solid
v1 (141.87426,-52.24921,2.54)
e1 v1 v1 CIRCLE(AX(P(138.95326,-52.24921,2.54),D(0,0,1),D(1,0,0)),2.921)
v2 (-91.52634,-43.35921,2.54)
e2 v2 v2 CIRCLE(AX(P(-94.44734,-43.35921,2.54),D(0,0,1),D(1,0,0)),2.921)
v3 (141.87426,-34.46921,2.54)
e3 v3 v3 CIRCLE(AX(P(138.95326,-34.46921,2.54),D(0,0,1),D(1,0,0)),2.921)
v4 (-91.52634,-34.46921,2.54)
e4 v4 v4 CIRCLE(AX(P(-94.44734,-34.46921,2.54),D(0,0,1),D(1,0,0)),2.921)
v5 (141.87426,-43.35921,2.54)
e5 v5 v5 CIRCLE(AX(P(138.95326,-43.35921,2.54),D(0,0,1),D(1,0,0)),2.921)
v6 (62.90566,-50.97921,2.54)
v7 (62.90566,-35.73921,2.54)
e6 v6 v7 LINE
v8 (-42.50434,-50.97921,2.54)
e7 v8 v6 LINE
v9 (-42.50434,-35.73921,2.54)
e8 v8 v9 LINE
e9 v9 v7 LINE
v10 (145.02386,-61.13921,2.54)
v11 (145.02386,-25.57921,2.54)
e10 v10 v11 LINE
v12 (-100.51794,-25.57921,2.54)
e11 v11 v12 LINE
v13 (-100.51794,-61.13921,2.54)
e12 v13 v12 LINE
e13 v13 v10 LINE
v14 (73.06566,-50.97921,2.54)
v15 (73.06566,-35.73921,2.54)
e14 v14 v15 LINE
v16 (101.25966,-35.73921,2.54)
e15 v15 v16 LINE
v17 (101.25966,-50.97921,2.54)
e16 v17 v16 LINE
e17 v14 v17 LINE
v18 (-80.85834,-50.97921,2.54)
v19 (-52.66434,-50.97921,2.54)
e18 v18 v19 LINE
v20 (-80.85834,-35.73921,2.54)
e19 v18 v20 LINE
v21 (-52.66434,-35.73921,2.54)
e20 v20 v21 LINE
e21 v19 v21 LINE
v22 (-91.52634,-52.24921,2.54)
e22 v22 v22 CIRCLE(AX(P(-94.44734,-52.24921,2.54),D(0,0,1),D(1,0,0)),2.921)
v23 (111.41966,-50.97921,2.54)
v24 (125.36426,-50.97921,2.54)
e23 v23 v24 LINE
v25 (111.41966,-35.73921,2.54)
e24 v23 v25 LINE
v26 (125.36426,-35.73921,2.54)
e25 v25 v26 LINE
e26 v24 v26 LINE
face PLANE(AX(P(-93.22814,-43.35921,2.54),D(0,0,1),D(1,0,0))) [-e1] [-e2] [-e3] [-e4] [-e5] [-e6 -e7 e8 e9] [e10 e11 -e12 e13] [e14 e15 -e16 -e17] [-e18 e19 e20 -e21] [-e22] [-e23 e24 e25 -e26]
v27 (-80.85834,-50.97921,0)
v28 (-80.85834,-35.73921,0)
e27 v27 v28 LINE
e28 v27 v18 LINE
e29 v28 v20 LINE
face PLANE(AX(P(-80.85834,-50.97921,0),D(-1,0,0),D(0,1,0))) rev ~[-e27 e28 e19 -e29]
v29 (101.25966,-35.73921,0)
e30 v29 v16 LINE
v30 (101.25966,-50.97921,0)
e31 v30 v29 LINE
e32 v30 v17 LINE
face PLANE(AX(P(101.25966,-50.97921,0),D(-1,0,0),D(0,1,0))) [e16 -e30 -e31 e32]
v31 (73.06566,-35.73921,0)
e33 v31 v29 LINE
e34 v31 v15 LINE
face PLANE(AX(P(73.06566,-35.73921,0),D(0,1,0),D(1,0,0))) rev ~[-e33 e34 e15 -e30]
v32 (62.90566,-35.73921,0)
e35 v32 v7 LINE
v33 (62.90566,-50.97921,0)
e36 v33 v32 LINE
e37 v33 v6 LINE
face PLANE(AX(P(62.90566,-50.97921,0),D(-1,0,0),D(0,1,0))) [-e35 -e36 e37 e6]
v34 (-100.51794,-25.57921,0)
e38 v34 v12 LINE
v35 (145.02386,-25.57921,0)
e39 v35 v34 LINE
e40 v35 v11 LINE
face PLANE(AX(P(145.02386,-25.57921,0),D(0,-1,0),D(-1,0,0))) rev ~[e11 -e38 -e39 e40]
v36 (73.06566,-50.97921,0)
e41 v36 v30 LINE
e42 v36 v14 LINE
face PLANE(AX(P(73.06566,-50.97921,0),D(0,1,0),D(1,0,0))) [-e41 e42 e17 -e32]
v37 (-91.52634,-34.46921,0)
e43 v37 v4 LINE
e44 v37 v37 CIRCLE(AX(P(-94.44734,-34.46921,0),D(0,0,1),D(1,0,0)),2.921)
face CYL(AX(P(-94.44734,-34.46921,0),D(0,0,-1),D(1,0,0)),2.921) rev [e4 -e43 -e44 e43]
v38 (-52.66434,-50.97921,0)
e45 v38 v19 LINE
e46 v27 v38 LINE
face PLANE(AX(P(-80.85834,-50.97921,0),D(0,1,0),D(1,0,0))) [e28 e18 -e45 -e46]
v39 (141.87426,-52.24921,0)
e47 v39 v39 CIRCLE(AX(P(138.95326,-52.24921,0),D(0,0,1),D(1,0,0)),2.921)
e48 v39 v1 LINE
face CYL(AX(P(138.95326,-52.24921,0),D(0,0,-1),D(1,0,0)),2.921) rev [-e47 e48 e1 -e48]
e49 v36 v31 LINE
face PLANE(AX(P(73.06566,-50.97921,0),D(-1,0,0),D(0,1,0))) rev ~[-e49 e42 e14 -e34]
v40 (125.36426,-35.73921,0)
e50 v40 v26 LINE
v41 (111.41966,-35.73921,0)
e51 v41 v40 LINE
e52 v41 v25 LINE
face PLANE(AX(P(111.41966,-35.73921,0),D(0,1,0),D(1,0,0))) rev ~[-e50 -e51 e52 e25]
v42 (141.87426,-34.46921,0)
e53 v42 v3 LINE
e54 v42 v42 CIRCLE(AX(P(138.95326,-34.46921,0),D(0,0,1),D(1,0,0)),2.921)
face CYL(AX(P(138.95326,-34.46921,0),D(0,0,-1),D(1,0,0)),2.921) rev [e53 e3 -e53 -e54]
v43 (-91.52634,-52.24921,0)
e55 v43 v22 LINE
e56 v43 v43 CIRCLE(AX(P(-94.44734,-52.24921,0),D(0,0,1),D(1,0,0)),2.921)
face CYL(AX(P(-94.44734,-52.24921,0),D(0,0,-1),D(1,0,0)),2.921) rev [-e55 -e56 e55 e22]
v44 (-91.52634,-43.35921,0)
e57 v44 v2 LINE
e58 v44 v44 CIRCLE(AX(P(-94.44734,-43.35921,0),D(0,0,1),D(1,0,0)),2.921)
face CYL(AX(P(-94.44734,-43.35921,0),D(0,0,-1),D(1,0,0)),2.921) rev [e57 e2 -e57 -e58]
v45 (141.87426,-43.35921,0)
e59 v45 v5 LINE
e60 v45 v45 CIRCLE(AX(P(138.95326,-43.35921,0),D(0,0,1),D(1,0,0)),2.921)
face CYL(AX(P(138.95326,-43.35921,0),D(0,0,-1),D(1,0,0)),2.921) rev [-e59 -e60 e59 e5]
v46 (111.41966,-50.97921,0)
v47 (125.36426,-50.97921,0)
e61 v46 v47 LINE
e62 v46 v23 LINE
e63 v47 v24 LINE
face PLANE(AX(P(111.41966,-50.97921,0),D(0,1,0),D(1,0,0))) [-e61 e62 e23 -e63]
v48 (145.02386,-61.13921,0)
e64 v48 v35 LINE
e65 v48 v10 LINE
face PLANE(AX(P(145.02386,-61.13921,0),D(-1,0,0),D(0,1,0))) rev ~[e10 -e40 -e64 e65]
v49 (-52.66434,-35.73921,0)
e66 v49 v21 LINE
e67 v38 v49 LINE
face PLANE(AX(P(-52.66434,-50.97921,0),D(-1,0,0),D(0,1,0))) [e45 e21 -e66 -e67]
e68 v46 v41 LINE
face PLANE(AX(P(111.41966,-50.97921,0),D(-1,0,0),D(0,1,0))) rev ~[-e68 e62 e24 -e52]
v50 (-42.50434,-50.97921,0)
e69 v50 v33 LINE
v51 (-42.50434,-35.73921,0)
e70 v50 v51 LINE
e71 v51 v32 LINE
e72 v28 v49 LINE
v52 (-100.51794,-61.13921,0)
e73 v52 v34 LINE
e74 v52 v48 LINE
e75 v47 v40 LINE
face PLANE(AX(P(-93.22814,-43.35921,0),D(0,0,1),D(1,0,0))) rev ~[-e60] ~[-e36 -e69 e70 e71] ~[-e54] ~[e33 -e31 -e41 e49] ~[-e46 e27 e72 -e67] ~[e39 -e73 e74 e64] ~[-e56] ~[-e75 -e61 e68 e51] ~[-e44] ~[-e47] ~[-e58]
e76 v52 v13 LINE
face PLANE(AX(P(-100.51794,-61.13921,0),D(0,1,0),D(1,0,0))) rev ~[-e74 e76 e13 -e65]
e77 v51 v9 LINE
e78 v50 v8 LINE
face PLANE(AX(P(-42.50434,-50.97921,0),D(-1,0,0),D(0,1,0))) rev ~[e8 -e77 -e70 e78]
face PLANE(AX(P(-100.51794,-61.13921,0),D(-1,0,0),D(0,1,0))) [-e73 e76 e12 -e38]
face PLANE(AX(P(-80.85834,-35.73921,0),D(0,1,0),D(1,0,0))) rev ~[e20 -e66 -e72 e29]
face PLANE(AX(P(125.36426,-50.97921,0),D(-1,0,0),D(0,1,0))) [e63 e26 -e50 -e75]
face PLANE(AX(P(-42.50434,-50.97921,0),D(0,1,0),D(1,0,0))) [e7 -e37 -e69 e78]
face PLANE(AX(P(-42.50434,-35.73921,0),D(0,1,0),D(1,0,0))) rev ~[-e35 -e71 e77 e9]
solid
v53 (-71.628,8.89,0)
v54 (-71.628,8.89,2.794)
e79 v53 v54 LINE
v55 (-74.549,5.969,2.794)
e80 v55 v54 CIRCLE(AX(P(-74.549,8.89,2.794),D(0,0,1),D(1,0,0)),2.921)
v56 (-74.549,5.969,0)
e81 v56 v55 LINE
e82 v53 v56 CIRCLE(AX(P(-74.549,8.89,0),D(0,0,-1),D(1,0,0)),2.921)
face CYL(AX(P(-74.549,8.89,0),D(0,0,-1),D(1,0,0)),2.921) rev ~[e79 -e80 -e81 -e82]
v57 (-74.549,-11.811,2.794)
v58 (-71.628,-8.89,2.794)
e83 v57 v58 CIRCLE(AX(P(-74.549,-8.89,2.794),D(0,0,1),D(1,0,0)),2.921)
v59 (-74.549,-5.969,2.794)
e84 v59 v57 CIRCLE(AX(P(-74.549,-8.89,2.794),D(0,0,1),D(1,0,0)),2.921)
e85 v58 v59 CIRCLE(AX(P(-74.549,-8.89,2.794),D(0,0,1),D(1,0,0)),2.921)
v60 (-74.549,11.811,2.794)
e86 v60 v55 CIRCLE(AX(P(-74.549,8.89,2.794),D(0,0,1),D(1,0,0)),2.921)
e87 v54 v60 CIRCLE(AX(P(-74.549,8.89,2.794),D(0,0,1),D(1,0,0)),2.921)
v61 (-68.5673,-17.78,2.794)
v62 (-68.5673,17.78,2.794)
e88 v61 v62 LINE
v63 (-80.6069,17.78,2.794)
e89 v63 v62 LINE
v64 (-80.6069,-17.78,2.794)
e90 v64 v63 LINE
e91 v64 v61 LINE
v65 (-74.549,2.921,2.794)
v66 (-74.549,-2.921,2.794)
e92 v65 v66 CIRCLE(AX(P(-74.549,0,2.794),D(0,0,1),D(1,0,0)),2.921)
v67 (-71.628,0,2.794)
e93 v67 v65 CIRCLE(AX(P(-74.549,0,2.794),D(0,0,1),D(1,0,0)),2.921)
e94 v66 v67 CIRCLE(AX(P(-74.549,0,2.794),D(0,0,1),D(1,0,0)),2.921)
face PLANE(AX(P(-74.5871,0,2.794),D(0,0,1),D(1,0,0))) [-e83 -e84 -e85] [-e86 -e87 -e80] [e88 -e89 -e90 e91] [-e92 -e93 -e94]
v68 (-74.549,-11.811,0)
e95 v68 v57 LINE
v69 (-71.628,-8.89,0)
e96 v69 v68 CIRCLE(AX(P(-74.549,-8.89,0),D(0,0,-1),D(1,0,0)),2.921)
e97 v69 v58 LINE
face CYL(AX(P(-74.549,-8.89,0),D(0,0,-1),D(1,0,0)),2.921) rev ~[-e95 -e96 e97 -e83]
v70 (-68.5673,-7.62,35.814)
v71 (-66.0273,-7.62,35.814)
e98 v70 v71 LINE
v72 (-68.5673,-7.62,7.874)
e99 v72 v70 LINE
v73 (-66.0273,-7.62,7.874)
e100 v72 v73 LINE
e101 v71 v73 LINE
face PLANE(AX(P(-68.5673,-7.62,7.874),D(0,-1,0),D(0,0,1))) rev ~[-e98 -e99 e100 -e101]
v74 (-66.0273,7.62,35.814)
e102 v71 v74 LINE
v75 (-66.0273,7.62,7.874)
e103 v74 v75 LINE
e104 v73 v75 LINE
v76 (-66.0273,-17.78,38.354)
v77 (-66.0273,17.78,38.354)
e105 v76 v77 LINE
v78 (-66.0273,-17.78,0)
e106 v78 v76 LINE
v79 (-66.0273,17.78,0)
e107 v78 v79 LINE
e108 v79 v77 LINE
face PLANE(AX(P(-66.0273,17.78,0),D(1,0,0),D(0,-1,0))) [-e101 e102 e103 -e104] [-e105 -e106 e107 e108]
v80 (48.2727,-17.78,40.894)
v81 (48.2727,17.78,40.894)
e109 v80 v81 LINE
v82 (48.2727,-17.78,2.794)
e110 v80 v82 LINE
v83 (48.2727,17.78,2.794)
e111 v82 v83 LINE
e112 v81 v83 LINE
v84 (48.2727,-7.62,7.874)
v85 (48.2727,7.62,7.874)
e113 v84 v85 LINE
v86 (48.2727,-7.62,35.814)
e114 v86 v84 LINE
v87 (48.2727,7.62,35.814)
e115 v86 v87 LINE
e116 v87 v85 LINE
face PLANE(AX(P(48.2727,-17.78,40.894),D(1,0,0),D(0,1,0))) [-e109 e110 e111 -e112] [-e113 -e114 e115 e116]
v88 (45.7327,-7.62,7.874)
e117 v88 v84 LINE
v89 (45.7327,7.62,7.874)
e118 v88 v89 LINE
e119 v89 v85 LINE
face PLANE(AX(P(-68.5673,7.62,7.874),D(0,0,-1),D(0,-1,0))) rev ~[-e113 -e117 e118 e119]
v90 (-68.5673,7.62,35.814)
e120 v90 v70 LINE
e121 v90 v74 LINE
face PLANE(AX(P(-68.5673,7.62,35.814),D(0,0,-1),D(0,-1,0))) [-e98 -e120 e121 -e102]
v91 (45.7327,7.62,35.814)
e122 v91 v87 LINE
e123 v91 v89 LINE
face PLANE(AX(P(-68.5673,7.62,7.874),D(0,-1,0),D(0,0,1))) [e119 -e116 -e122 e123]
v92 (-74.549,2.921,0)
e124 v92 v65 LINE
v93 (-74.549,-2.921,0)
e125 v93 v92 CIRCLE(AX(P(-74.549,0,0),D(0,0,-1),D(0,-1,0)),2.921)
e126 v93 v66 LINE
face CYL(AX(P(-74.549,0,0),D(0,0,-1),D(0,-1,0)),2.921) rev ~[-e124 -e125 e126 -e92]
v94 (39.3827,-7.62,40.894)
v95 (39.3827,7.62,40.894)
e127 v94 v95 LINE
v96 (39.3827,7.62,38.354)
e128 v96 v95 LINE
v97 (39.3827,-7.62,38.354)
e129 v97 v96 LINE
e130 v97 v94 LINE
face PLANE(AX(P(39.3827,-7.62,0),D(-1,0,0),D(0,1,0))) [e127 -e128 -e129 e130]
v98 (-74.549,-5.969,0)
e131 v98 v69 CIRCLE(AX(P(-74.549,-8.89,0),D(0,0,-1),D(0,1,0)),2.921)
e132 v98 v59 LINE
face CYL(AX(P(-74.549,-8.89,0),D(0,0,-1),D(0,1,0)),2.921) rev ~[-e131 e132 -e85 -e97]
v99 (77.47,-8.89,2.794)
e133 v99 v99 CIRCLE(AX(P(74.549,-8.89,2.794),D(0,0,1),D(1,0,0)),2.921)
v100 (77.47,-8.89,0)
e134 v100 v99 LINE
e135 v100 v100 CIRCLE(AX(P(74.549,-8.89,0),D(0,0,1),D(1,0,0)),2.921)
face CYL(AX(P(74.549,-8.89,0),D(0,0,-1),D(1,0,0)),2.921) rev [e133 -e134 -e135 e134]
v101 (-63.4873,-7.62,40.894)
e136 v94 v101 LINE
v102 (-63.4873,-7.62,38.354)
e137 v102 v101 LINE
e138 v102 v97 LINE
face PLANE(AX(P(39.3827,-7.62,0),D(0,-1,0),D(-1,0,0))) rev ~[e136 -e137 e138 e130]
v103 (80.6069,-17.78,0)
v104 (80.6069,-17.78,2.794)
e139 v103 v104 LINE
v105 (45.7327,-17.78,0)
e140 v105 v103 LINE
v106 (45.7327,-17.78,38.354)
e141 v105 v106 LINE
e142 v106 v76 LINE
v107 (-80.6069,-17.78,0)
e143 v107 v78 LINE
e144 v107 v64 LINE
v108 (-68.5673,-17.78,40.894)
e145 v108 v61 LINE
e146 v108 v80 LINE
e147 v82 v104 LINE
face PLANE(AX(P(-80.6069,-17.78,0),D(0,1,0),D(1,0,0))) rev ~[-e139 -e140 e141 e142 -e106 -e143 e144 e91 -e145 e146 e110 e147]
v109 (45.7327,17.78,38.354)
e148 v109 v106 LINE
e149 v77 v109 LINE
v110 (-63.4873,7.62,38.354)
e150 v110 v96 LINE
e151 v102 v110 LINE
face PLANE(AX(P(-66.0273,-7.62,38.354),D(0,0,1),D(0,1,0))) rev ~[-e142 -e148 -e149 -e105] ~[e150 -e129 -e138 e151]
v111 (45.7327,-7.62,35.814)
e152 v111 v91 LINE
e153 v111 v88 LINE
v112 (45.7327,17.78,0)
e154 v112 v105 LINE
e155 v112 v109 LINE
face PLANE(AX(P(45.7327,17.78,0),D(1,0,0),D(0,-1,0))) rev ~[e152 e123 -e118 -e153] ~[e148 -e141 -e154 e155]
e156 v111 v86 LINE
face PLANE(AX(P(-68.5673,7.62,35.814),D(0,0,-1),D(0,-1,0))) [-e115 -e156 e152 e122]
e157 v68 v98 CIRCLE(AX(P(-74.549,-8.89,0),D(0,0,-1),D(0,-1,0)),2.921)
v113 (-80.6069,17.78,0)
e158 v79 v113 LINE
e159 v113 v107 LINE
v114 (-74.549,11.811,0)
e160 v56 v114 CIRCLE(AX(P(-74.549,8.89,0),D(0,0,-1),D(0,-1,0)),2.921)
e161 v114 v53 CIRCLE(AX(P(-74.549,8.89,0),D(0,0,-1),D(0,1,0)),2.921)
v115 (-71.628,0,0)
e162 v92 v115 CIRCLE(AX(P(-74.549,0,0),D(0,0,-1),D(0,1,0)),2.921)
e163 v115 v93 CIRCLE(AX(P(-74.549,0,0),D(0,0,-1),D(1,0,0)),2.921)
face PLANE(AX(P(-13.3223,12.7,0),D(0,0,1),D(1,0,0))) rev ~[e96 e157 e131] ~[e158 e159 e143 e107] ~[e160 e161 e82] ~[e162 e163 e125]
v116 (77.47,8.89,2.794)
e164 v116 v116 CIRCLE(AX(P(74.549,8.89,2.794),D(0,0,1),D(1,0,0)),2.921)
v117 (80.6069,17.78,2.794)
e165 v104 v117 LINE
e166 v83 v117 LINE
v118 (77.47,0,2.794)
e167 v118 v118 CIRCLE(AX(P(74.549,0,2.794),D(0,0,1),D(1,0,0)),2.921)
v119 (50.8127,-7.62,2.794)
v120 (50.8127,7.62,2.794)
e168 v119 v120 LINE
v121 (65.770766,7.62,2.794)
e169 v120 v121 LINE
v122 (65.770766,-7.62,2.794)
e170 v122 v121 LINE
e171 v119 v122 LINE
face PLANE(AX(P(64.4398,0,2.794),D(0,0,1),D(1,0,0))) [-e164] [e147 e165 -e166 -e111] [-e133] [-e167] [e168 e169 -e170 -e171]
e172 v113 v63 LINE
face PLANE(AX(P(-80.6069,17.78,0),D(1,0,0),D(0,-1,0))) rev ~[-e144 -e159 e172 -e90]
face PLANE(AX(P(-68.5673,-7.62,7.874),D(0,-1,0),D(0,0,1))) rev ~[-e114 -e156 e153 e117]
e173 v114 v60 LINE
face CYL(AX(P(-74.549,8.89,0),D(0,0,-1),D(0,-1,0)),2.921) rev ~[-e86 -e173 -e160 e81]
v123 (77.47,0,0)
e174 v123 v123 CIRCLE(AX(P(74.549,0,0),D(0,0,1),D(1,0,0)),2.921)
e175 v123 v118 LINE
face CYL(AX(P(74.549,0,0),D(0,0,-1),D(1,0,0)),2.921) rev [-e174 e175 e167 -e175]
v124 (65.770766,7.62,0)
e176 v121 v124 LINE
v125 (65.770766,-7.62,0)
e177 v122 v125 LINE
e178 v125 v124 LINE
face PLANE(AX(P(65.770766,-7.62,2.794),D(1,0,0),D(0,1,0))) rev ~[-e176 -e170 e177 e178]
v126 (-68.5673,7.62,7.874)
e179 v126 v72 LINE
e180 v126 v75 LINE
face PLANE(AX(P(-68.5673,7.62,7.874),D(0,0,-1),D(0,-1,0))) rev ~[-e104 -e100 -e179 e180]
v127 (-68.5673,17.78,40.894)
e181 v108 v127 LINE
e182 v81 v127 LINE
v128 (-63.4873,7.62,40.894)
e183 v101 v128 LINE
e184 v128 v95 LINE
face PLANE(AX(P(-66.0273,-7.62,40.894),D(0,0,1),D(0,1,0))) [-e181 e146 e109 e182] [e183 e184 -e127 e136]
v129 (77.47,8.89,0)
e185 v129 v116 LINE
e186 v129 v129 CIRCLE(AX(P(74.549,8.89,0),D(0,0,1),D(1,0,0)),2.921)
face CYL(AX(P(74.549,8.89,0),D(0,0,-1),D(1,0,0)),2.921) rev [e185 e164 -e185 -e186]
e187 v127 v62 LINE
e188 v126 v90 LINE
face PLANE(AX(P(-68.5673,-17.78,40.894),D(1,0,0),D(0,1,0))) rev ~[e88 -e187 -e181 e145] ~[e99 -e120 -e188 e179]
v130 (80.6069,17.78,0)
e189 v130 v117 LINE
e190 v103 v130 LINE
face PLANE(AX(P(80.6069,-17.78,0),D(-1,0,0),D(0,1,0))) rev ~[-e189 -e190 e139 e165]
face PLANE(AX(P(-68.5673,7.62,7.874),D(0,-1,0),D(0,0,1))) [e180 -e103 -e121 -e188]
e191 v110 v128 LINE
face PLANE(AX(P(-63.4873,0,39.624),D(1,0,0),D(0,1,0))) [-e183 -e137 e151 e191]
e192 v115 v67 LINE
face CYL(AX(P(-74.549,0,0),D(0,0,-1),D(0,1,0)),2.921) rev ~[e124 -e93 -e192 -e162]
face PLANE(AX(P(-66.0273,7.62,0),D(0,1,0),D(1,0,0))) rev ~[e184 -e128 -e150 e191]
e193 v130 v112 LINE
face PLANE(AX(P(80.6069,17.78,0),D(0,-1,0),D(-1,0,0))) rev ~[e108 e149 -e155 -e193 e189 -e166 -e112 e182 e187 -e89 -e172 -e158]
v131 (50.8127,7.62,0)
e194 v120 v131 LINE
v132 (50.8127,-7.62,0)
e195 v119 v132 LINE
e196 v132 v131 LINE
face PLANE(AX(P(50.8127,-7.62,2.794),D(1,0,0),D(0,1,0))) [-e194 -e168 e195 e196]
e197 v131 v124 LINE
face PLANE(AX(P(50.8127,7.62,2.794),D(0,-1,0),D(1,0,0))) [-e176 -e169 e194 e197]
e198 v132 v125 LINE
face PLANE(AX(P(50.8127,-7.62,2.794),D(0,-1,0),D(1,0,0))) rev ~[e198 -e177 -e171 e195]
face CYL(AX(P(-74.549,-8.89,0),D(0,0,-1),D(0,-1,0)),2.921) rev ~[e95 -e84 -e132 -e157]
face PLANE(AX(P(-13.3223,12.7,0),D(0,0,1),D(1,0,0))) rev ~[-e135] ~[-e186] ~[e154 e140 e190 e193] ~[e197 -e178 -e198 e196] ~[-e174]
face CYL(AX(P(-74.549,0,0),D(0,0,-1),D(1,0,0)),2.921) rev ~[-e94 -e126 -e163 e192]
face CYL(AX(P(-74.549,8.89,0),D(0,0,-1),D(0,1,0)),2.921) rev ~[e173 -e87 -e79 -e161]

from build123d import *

# Parameters (mm, degrees)
F0_W      = 105.41
F0_H      = 10.16
F0_W_2    = 26.6446
F0_H_2    = 15.24
F0_R      = 2.921
F1_DEPTH  = 40.894
F2_W      = 12.0396
F2_H      = 35.56
F2_R      = 2.921
F2_W_2    = 32.3342
F3_DEPTH  = 38.1
F4_W      = 105.41
F4_H      = 10.16
F4_W_2    = 1.27
F4_H_2    = 35.56
F5_DEPTH  = 38.354
F6_W      = 15.24
F6_H      = 27.94
F7_DEPTH  = 149.1752
F8_W      = 14.9580658293
F8_H      = 15.24
F9_DEPTH  = 5.08
F10_W     = 14.5796
F10_H     = 35.56
F10_R     = 2.921
F10_W_2   = 38.354
F10_W_3   = 28.194
F10_H_2   = 15.24
F10_W_4   = 115.57
F10_W_5   = 105.41
F10_W_6   = 24.1046
F10_W_7   = 13.9446
F11_DEPTH = 2.54
F12_W     = 15.24
F12_H     = 2.54
F13_DEPTH = 2.54


with BuildPart() as f1:
    # F0 (on Top) → F1 (new body)
    with BuildSketch(Plane.XY):
        with Locations((-13.3223, 12.7)):
            Rectangle(F0_W, F0_H)
        with BuildLine():
            Line((-66.0273, 7.62), (-66.0273, 17.78))
            Line((-66.0273, 17.78), (-74.549, 17.78))
            Line((-74.549, 17.78), (-74.549, 11.811))
            ThreePointArc((-74.549, 11.811), (-72.4835410922, 10.9554589078), (-71.628, 8.89))
            ThreePointArc((-71.628, 8.89), (-72.4835410922, 6.8245410922), (-74.549, 5.969))
            Line((-74.549, 5.969), (-74.549, 2.921))
            ThreePointArc((-74.549, 2.921), (-72.4835410922, 2.0654589078), (-71.628, 0))
            ThreePointArc((-71.628, 0), (-72.4835410922, -2.0654589078), (-74.549, -2.921))
            Line((-74.549, -2.921), (-74.549, -5.969))
            ThreePointArc((-74.549, -5.969), (-72.4835410922, -6.8245410922), (-71.628, -8.89))
            ThreePointArc((-71.628, -8.89), (-72.4835410922, -10.9554589078), (-74.549, -11.811))
            Line((-74.549, -11.811), (-74.549, -17.78))
            Line((-74.549, -17.78), (-66.0273, -17.78))
            Line((-66.0273, -17.78), (-66.0273, -7.62))
            Line((-66.0273, -7.62), (-66.0273, 7.62))
        make_face()
        with Locations((-13.3223, -12.7)):
            Rectangle(F0_W, F0_H)
        with Locations((52.705, -12.7)):
            Rectangle(F0_W_2, F0_H)
        with Locations((52.705, 12.7)):
            Rectangle(F0_W_2, F0_H)
        with Locations((52.705, 0)):
            Rectangle(F0_W_2, F0_H_2)
        Polygon((80.6069, -17.78), (80.6069, 17.78), (66.0273, 17.78), (66.0273, 7.62), (66.0273, -7.62), (66.0273, -17.78), align=None)
        with Locations((74.549, -8.89)):
            Circle(F0_R, mode=Mode.SUBTRACT)
        with Locations((74.549, 0)):
            Circle(F0_R, mode=Mode.SUBTRACT)
        with Locations((74.549, 8.89)):
            Circle(F0_R, mode=Mode.SUBTRACT)
        with BuildLine():
            Line((-74.549, 11.811), (-74.549, 17.78))
            Line((-74.549, 17.78), (-80.6069, 17.78))
            Line((-80.6069, 17.78), (-80.6069, 0))
            Line((-80.6069, 0), (-80.6069, -8.89))
            Line((-80.6069, -8.89), (-80.6069, -17.78))
            Line((-80.6069, -17.78), (-74.549, -17.78))
            Line((-74.549, -17.78), (-74.549, -11.811))
            ThreePointArc((-74.549, -11.811), (-77.47, -8.89), (-74.549, -5.969))
            Line((-74.549, -5.969), (-74.549, -2.921))
            ThreePointArc((-74.549, -2.921), (-77.47, 0), (-74.549, 2.921))
            Line((-74.549, 2.921), (-74.549, 5.969))
            ThreePointArc((-74.549, 5.969), (-77.47, 8.89), (-74.549, 11.811))
        make_face()
    extrude(amount=F1_DEPTH)

    # F2 (on face) → F3 (cut)
    with BuildSketch(Plane.XY.offset(40.894)):
        with Locations((-74.5871, 0)):
            Rectangle(F2_W, F2_H)
        with Locations((-74.549, -8.89)):
            Circle(F2_R, mode=Mode.SUBTRACT)
        with Locations((-74.549, 0)):
            Circle(F2_R, mode=Mode.SUBTRACT)
        with Locations((-74.549, 8.89)):
            Circle(F2_R, mode=Mode.SUBTRACT)
        with Locations((64.4398, 0)):
            Rectangle(F2_W_2, F2_H)
        with Locations((74.549, -8.89)):
            Circle(F2_R, mode=Mode.SUBTRACT)
        with Locations((74.549, 0)):
            Circle(F2_R, mode=Mode.SUBTRACT)
        with Locations((74.549, 8.89)):
            Circle(F2_R, mode=Mode.SUBTRACT)
    extrude(amount=-F3_DEPTH, mode=Mode.SUBTRACT)

    # F4 (on face) → F5 (cut)
    with BuildSketch(Plane(origin=(0, 0, 0), x_dir=(1, 0, 0), z_dir=(0, 0, -1))):
        with Locations((-13.3223, 12.7)):
            Rectangle(F4_W, F4_H)
        with Locations((-13.3223, -12.7)):
            Rectangle(F4_W, F4_H)
        Polygon((39.3827, 17.78), (39.3827, 7.62), (39.3827, -7.62), (39.3827, -17.78), (44.4627, -17.78), (44.4627, 17.78), align=None)
        with Locations((45.0977, 0)):
            Rectangle(F4_W_2, F4_H_2)
    extrude(amount=-F5_DEPTH, mode=Mode.SUBTRACT)

    # F6 (on face) → F7 (cut, through all)
    with BuildSketch(Plane(origin=(-68.5673, 0, 0), x_dir=(0, -1, 0), z_dir=(-1, 0, 0))):
        with Locations((0, 21.844)):
            Rectangle(F6_W, F6_H)
    extrude(amount=-F7_DEPTH, mode=Mode.SUBTRACT)

    # F8 (on face) → F9 (cut)
    with BuildSketch(Plane.XY.offset(2.794)):
        with Locations((58.2917329146, 0)):
            Rectangle(F8_W, F8_H)
    extrude(amount=-F9_DEPTH, mode=Mode.SUBTRACT)

    # F12 (on face) → F13 (join)
    with BuildSketch(Plane.YZ.offset(-66.0273)):
        with Locations((0, 39.624)):
            Rectangle(F12_W, F12_H)
    extrude(amount=F13_DEPTH)


with BuildPart() as f11:
    # F10 (on Top) → F11 (new body)
    with BuildSketch(Plane.XY):
        with Locations((-93.2281401838, -43.3592097834)):
            Rectangle(F10_W, F10_H)
        with Locations((-94.4473401838, -52.2492097834)):
            Circle(F10_R, mode=Mode.SUBTRACT)
        with Locations((-94.4473401838, -43.3592097834)):
            Circle(F10_R, mode=Mode.SUBTRACT)
        with Locations((-94.4473401838, -34.4692097834)):
            Circle(F10_R, mode=Mode.SUBTRACT)
        with Locations((-66.7613401838, -43.3592097834)):
            Rectangle(F10_W_2, F10_H)
        with Locations((-66.7613401838, -43.3592097834)):
            Rectangle(F10_W_3, F10_H_2, mode=Mode.SUBTRACT)
        with Locations((10.2006598162, -43.3592097834)):
            Rectangle(F10_W_4, F10_H)
        with Locations((10.2006598162, -43.3592097834)):
            Rectangle(F10_W_5, F10_H_2, mode=Mode.SUBTRACT)
        with Locations((87.1626598162, -43.3592097834)):
            Rectangle(F10_W_2, F10_H)
        with Locations((87.1626598162, -43.3592097834)):
            Rectangle(F10_W_3, F10_H_2, mode=Mode.SUBTRACT)
        with Locations((118.3919598162, -43.3592097834)):
            Rectangle(F10_W_6, F10_H)
        with Locations((118.3919598162, -43.3592097834)):
            Rectangle(F10_W_7, F10_H_2, mode=Mode.SUBTRACT)
        with Locations((137.7340598162, -43.3592097834)):
            Rectangle(F10_W, F10_H)
        with Locations((138.9532598162, -52.2492097834)):
            Circle(F10_R, mode=Mode.SUBTRACT)
        with Locations((138.9532598162, -43.3592097834)):
            Circle(F10_R, mode=Mode.SUBTRACT)
        with Locations((138.9532598162, -34.4692097834)):
            Circle(F10_R, mode=Mode.SUBTRACT)
    extrude(amount=F11_DEPTH)


solid = Compound([f1.part, f11.part])
